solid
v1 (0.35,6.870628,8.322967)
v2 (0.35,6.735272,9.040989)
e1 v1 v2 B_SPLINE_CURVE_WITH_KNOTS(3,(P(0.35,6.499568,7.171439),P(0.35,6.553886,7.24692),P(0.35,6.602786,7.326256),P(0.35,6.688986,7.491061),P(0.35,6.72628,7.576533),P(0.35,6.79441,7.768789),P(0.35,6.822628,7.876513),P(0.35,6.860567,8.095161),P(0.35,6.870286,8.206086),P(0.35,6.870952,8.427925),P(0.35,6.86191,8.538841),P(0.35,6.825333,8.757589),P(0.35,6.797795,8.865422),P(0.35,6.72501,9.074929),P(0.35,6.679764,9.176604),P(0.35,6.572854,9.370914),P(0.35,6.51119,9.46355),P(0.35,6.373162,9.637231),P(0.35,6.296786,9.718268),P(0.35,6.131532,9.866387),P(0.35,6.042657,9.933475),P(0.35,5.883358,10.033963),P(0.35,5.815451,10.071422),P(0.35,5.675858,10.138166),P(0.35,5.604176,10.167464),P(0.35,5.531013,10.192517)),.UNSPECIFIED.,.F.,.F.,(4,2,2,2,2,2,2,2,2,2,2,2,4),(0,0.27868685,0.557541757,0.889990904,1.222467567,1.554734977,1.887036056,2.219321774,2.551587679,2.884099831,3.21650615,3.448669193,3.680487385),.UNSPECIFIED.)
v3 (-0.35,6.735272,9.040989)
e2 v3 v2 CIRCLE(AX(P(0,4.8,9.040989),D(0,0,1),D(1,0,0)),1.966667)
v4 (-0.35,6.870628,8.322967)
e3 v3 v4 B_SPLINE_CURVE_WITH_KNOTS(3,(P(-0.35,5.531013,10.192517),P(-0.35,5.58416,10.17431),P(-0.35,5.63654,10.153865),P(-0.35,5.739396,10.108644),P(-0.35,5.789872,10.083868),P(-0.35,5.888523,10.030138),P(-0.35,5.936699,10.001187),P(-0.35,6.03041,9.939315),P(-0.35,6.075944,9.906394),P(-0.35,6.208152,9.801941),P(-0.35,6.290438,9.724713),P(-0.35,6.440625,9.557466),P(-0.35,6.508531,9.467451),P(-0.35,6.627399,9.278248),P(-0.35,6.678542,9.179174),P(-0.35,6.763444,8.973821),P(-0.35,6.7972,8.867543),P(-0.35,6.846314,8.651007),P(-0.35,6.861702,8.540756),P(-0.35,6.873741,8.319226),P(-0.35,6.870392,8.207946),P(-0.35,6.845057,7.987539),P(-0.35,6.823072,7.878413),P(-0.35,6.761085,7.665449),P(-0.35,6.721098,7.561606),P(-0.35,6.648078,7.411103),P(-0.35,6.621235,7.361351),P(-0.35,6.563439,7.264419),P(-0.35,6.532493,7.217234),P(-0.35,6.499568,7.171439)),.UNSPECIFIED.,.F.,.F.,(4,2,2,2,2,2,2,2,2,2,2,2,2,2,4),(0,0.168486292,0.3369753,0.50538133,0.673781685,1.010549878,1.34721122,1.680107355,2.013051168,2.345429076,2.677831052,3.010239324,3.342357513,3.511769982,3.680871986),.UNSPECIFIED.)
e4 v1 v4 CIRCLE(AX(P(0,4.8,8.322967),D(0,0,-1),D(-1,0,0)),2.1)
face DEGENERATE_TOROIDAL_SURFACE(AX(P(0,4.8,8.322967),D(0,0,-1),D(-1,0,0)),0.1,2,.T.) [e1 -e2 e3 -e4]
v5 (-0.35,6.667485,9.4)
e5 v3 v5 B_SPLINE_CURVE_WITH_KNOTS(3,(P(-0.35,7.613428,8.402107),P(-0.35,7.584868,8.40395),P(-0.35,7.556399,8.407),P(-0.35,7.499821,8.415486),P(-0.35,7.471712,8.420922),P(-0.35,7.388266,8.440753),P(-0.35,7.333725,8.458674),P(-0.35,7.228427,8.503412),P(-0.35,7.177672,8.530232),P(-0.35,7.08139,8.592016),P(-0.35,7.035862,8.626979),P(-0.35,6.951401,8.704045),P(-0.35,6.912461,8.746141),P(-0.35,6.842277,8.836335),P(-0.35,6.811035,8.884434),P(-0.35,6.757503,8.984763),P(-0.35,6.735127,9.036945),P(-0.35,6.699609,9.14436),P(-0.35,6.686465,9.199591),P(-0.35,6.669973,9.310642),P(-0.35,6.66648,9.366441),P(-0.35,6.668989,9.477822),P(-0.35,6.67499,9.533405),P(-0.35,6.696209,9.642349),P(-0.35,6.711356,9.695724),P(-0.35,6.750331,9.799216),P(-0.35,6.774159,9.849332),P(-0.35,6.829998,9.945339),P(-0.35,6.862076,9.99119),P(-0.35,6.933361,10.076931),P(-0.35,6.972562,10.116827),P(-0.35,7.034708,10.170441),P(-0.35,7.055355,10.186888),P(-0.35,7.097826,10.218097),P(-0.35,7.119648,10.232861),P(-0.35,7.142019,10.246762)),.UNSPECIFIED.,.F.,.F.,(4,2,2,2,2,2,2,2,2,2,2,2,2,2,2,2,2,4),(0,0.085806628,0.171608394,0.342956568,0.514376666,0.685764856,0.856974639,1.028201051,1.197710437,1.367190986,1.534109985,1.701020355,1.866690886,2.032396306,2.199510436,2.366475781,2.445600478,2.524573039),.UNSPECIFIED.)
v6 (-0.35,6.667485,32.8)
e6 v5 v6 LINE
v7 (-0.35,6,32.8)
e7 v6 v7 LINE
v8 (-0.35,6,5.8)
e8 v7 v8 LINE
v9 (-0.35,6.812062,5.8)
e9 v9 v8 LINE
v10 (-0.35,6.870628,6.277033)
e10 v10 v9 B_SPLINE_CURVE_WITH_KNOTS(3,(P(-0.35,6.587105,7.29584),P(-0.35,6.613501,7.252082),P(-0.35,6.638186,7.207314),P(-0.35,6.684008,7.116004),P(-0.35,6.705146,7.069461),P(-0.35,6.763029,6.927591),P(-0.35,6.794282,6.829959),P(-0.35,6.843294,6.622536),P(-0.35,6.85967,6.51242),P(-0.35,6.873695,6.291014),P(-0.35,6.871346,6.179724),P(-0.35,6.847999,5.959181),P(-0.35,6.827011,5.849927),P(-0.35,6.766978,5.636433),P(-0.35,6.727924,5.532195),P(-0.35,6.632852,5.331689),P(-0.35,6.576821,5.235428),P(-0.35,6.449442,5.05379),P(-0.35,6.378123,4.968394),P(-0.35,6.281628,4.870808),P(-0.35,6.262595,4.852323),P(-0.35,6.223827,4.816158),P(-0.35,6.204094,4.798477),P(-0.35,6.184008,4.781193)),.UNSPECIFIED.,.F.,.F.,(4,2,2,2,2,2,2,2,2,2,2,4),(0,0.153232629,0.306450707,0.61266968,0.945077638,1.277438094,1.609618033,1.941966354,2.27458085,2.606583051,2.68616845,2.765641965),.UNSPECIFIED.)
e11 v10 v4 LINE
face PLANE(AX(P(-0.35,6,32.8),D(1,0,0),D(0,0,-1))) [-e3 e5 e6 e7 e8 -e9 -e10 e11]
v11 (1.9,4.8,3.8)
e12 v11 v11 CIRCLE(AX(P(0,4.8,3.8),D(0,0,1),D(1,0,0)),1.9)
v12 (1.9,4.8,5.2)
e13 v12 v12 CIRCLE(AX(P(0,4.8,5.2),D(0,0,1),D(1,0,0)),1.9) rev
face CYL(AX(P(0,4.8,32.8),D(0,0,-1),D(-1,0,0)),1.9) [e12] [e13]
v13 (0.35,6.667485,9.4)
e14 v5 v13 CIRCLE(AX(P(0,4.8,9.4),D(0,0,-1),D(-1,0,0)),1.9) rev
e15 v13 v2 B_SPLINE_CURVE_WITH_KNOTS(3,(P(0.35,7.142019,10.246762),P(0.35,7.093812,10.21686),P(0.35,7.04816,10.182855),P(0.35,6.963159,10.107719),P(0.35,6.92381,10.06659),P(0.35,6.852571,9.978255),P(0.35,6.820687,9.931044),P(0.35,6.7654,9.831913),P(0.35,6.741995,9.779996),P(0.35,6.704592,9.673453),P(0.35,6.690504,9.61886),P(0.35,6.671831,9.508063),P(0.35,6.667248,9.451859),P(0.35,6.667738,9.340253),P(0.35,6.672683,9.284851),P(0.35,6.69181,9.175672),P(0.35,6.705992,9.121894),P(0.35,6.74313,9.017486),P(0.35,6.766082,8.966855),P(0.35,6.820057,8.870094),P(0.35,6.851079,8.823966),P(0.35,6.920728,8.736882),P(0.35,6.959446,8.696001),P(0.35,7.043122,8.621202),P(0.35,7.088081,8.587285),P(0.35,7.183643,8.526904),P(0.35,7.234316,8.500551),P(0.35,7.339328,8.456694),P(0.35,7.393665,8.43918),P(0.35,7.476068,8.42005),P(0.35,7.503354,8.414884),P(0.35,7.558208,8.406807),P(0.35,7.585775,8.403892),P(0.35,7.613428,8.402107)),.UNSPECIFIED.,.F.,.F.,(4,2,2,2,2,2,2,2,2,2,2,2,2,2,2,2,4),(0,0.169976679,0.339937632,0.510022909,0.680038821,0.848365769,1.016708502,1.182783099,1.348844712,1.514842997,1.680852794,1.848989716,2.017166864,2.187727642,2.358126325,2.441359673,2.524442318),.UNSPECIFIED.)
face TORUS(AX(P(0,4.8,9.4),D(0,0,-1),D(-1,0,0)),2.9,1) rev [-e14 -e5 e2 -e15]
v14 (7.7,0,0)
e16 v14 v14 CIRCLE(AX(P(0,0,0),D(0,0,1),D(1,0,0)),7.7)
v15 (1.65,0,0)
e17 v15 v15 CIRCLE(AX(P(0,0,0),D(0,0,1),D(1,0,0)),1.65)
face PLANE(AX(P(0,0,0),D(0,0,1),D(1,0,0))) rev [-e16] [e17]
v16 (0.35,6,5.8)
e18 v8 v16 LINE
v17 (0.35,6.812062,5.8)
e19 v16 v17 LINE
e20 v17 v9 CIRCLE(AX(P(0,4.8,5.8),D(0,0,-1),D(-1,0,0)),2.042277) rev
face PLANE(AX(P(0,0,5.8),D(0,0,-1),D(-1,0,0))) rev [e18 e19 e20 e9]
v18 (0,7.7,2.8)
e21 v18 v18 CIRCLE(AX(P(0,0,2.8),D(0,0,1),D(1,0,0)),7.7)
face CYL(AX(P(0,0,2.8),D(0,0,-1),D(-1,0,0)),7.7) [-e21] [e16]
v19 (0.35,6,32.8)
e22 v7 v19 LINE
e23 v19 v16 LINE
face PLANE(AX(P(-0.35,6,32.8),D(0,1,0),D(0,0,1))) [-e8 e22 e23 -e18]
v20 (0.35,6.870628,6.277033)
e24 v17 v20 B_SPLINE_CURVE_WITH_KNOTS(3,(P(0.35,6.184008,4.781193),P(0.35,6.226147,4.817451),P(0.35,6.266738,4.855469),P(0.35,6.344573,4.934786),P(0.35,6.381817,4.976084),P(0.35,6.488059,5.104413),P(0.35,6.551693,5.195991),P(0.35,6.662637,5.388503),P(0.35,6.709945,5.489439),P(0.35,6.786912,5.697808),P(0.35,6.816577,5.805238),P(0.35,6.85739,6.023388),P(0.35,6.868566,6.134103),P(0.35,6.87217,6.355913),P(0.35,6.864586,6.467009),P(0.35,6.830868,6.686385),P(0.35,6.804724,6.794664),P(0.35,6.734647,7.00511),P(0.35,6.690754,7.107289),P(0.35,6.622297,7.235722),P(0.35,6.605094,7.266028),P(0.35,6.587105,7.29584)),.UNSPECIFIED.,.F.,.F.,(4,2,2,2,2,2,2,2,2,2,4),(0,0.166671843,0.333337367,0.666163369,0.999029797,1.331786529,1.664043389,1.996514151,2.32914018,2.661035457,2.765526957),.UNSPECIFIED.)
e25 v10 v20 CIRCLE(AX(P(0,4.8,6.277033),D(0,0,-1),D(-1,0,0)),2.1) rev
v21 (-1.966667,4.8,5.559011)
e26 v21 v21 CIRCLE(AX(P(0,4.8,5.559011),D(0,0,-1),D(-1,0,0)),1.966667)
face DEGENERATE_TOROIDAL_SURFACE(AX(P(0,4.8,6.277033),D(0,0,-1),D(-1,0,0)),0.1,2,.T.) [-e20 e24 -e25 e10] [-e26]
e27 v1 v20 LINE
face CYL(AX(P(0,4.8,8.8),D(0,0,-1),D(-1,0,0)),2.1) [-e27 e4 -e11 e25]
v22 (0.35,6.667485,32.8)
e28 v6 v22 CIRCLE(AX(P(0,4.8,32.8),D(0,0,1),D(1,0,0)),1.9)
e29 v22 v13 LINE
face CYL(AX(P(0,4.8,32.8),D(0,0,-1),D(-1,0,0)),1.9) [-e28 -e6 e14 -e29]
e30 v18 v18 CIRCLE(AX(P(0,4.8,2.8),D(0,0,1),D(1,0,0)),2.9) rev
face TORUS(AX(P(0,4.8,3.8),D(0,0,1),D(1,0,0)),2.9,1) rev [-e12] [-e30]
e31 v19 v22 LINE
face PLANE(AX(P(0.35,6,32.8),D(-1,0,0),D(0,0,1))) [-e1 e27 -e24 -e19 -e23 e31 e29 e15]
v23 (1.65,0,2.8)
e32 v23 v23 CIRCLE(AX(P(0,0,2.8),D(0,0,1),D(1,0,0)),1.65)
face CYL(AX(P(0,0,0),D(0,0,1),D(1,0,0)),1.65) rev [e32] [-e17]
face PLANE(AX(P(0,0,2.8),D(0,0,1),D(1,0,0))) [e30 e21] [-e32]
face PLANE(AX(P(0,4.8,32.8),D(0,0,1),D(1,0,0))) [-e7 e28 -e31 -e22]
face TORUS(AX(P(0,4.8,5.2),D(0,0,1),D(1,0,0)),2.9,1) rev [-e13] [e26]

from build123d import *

# Parameters (mm, degrees)
ESQUISSE1_R             = 7.7
BOSS_EXTRU_1_DEPTH      = 2.8
ESQUISSE2_R             = 1.9
BOSS_EXTRU_2_DEPTH      = 30
ESQUISSE3_R             = 1.65
ENL_V_MAT_EXTRU_1_DEPTH = 32.91520014
CONG_2_R                = 1
ESQUISSE4_R             = 2.1
ESQUISSE4_R_2           = 1.9
BOSS_EXTRU_3_DEPTH      = 3
CONG_3_R                = 1
CONG_4_R                = 2
ESQUISSE5_W             = 0.7
ESQUISSE5_H             = 1.4
ENL_V_MAT_EXTRU_2_DEPTH = 30.113227234


# Some blends are built 0.0001 mm under size
with BuildPart() as part:
    # Esquisse1 → Boss.-Extru.1 (new body)
    with BuildSketch(Plane.XY):
        Circle(ESQUISSE1_R)
    extrude(amount=BOSS_EXTRU_1_DEPTH)

    # Esquisse2 → Boss.-Extru.2 (add)
    with BuildSketch(Plane.XY.offset(2.8)):
        with Locations((0, 4.8)):
            Circle(ESQUISSE2_R)
    extrude(amount=BOSS_EXTRU_2_DEPTH)

    # Esquisse3 → Enlèv. mat.-Extru.1 (cut, through all)
    with BuildSketch(Plane.XY.offset(2.8)):
        Circle(ESQUISSE3_R)
    extrude(amount=-ENL_V_MAT_EXTRU_1_DEPTH, mode=Mode.SUBTRACT)

    # Congé2
    cong_2_edges = [part.edges().sort_by_distance(p)[0] for p in [
        (-1.9, 4.8, 2.8),
    ]]
    fillet(cong_2_edges, radius=CONG_2_R - 0.0001)  # a hair under: the kernel refuses the full size

    # Esquisse4 → Boss.-Extru.3 (add)
    with BuildSketch(Plane.XY.offset(5.8)):
        with Locations((0, 4.8)):
            Circle(ESQUISSE4_R)
        with Locations((0, 4.8)):
            Circle(ESQUISSE4_R_2, mode=Mode.SUBTRACT)
    extrude(amount=BOSS_EXTRU_3_DEPTH)

    # Congé3
    # the kernel refuses this fillet: 1 mm, written as the material it adds along each edge
    with BuildSketch(Plane(origin=(0, 4.8, 5.8), x_dir=(1, 0, 0), z_dir=(0, -1, 0))) as cong_3_piece_1:
        with BuildLine():
            CenterArc((2.9, -0.6), CONG_3_R, 143.130102354, 36.869897646)
            Line((2.1, 0), (2.084, 0.012))
            ThreePointArc((2.084, 0.012), (2, 0.02), (1.9, 0.02))
            Line((1.9, 0.02), (1.88, 0))
            Line((1.88, 0), (1.88, -0.6))
            Line((1.88, -0.6), (1.9, -0.6))
        make_face()
    revolve(axis=Axis((0, 4.8, 5.8), (0, 0, 1)))
    with BuildSketch(Plane(origin=(0, 4.8, 8.8), x_dir=(1, 0, 0), z_dir=(0, -1, 0))) as cong_3_piece_2:
        with BuildLine():
            CenterArc((2.9, 0.6), CONG_3_R, 180, 36.869897646)
            Line((1.9, 0.6), (1.88, 0.6))
            Line((1.88, 0.6), (1.88, 0))
            Line((1.88, 0), (1.9, -0.02))
            ThreePointArc((1.9, -0.02), (2, -0.02), (2.084, -0.012))
            Line((2.084, -0.012), (2.1, 0))
        make_face()
    revolve(axis=Axis((0, 4.8, 8.8), (0, 0, 1)))

    # Congé4
    cong_4_edges = [part.edges().sort_by_distance(p)[0] for p in [
        (-2.1, 4.8, 8.8),
        (-2.1, 4.8, 5.8),
    ]]
    fillet(cong_4_edges, radius=CONG_4_R)

    # Esquisse5 → Enlèv. mat.-Extru.2 (cut, through all)
    with BuildSketch(Plane.XY.offset(5.8)):
        with Locations((0, 6.7)):
            Rectangle(ESQUISSE5_W, ESQUISSE5_H)
    extrude(amount=ENL_V_MAT_EXTRU_2_DEPTH, mode=Mode.SUBTRACT)


solid = part.part
